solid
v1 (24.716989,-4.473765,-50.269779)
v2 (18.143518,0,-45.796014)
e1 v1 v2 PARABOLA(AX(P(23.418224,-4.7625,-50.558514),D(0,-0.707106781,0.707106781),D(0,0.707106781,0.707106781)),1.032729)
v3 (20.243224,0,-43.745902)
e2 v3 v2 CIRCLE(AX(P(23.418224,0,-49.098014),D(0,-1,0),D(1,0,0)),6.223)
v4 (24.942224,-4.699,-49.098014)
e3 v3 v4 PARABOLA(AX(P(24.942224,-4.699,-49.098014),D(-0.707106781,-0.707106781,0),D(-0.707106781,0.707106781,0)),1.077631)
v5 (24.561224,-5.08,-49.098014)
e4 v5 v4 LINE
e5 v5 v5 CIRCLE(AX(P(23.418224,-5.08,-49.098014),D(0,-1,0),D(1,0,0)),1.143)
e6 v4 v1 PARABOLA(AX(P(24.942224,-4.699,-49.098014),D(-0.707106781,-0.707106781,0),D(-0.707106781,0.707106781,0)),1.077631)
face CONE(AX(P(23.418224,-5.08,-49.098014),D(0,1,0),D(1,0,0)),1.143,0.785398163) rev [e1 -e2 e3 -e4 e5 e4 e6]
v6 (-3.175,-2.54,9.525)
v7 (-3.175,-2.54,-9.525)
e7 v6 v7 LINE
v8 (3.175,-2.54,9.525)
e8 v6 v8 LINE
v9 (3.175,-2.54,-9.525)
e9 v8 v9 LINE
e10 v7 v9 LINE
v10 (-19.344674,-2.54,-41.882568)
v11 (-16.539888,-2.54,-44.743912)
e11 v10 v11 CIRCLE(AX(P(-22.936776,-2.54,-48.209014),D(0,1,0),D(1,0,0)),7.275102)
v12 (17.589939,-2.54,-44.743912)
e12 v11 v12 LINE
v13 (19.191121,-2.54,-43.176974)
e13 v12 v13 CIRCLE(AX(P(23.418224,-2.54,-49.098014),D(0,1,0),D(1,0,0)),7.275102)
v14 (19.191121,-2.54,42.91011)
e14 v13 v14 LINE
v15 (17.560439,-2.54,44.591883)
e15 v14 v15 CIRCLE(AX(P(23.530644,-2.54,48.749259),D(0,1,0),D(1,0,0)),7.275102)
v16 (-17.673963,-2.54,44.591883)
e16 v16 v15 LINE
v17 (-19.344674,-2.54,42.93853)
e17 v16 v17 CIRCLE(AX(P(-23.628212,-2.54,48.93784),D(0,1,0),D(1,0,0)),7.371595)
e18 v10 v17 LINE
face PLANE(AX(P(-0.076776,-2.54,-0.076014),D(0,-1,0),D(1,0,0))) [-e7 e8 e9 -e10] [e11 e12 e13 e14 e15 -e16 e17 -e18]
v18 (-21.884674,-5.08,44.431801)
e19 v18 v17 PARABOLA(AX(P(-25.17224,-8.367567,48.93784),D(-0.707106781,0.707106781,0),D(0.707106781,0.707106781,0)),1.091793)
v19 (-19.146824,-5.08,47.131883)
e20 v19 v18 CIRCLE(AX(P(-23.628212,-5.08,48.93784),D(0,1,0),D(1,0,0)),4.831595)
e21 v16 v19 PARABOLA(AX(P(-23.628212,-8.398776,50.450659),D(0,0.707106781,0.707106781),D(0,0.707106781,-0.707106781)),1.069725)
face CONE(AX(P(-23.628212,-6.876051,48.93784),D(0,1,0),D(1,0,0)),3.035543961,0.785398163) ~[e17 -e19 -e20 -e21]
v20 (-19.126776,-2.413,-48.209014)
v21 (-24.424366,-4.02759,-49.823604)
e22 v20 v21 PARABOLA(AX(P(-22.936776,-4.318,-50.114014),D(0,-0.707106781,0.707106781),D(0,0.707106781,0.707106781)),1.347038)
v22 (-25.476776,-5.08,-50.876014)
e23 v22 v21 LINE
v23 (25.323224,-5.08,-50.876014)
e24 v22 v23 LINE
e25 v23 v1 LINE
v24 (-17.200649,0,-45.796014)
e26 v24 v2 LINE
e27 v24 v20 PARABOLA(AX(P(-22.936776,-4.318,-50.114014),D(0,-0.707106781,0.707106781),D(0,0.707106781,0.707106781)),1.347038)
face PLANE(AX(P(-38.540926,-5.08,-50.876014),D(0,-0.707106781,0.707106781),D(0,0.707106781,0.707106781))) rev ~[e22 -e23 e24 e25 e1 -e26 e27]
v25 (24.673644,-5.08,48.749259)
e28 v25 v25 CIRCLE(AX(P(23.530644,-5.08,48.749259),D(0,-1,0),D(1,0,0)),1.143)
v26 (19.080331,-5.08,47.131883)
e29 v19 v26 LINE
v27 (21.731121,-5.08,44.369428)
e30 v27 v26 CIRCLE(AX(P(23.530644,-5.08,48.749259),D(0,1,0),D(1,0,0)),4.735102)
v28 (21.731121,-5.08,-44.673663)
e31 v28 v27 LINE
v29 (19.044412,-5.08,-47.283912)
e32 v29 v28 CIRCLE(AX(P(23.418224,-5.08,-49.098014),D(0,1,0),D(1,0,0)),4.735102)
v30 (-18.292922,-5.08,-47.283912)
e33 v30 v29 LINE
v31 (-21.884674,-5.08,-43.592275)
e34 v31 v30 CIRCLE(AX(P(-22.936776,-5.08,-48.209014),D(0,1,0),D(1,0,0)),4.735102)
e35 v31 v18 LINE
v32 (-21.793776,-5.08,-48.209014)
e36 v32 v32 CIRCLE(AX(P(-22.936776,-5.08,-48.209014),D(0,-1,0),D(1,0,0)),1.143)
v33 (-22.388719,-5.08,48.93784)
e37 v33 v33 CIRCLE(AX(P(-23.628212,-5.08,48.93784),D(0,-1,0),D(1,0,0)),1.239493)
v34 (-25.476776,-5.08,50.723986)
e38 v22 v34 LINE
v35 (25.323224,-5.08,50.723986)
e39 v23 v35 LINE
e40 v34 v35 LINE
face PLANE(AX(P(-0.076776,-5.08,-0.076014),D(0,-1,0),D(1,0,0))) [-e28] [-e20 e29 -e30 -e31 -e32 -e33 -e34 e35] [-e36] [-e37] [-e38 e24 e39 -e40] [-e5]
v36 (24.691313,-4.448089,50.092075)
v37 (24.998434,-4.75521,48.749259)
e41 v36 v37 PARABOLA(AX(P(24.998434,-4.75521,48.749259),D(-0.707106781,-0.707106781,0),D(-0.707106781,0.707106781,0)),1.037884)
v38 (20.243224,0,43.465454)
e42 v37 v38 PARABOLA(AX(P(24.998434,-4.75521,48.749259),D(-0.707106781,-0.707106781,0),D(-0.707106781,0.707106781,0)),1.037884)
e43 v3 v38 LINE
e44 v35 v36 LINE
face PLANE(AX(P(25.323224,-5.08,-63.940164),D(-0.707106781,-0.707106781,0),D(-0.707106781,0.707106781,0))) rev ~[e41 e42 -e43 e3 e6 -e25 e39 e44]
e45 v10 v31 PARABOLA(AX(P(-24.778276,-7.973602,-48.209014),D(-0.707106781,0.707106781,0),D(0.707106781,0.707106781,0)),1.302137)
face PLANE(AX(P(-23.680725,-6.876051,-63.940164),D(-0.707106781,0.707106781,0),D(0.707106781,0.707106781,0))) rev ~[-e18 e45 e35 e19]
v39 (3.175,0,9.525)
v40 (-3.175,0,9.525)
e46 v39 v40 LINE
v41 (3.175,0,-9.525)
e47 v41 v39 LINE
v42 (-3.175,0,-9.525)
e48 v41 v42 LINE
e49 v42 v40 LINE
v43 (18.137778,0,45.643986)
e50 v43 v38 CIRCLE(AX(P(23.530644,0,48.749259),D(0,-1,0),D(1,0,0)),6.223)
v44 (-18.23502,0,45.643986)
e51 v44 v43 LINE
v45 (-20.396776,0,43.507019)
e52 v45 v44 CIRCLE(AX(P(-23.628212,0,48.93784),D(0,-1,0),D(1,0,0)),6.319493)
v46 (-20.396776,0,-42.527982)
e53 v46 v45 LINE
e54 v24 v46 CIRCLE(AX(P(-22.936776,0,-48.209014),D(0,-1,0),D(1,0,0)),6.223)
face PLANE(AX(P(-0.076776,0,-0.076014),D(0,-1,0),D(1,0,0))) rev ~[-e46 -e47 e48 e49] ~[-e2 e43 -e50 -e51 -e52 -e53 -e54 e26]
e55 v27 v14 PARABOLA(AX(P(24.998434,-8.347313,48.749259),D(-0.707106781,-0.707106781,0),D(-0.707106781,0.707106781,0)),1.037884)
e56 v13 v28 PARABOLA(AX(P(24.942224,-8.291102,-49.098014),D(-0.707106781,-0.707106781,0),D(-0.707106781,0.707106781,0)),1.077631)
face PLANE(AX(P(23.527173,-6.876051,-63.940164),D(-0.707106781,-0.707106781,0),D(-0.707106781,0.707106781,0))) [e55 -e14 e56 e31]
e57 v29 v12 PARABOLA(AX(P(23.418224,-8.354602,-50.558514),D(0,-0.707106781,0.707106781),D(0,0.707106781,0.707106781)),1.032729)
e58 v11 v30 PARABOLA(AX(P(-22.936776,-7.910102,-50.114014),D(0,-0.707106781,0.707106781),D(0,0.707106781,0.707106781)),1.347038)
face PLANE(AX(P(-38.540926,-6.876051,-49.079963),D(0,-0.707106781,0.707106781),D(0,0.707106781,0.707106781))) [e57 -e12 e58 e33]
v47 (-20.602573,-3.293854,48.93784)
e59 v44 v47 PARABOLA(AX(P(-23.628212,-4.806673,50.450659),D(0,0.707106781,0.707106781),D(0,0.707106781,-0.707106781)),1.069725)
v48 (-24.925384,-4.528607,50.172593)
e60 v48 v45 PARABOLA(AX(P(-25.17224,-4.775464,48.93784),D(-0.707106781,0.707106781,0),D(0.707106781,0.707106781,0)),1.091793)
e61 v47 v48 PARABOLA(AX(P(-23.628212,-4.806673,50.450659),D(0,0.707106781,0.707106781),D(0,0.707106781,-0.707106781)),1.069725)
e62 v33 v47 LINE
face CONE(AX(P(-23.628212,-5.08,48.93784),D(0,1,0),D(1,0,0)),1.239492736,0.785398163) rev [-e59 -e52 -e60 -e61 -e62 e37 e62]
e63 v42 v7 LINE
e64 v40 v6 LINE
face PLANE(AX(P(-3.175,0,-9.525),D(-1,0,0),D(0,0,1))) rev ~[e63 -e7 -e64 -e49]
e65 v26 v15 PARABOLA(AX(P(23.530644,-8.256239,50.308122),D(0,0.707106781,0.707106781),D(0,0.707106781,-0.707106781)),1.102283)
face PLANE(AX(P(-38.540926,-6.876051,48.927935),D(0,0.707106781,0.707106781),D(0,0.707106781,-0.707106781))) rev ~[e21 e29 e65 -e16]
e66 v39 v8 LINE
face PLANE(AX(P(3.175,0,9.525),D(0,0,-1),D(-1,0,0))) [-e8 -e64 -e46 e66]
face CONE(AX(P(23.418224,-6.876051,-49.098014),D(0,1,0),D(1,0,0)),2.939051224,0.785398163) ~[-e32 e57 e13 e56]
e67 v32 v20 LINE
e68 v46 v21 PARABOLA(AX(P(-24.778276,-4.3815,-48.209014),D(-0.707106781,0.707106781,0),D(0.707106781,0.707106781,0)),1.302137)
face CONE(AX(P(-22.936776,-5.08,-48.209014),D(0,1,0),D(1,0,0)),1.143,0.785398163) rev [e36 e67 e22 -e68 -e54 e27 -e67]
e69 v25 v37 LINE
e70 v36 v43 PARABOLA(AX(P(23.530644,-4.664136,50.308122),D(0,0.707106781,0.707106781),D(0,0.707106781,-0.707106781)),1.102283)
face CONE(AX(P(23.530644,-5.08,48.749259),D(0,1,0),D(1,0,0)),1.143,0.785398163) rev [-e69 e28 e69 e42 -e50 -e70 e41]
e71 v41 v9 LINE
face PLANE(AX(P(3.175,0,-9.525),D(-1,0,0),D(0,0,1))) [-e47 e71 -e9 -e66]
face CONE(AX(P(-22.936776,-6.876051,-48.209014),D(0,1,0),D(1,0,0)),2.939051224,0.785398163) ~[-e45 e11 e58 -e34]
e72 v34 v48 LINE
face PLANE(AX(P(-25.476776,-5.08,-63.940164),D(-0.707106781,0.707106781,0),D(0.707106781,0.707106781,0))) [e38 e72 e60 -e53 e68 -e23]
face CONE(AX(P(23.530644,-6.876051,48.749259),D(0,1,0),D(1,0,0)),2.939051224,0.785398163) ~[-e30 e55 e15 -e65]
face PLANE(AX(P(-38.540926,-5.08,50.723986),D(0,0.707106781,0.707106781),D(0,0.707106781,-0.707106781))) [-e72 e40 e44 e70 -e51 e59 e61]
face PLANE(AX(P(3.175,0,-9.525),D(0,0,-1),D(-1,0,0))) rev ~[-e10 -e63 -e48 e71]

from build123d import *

# Parameters (mm, degrees)
F0_W        = 50.8
F0_H        = 101.6
F0_R        = 1.143
F0_R_2      = 1.2394927364
F1_DEPTH    = 5.08
F2_T1_DEPTH = 127.7282991577
F2_T3_DEPTH = 76.9282991577
F3_T        = -2.54
F4_W        = 6.35
F4_H        = 19.05
F5_DEPTH    = 25.4


# Not quite as in the source:
# - a fillet or chamfer that OpenCascade refuses, or shapes differently, is made with other operations: its cross-section is extruded or revolved along the edge and cut away or added


with BuildPart() as f1:
    # F0 (on Front) → F1 (new body)
    with BuildSketch(Plane.XZ):
        with Locations((-0.076776122, -0.0760140894)):
            Rectangle(F0_W, F0_H)
        with Locations((-22.936776122, -48.2090140894)):
            Circle(F0_R, mode=Mode.SUBTRACT)
        with Locations((23.418223878, -49.0980140894)):
            Circle(F0_R, mode=Mode.SUBTRACT)
        with Locations((-23.6282116387, 48.9378400757)):
            Circle(F0_R_2, mode=Mode.SUBTRACT)
        with Locations((23.5306444928, 48.7492585503)):
            Circle(F0_R, mode=Mode.SUBTRACT)
    extrude(amount=F1_DEPTH)

    # F2: chamfer of 5.08 on 8 edges, made by hand

    # F2_s2 → F2_t1 (cut)
    with BuildSketch(Plane.XY.offset(-63.9401636683)):
        Polygon((25.323223878, -5.08), (20.243223878, 0), (25.323223878, 0), align=None)
        Polygon((-25.476776122, -5.08), (-20.396776122, 0), (-25.476776122, 0), align=None)
    extrude(amount=F2_T1_DEPTH, mode=Mode.SUBTRACT)

    # F2_s4 → F2_t3 (cut)
    with BuildSketch(Plane.YZ.offset(-38.5409257009)):
        Polygon((-5.08, 50.7239859106), (0, 45.6439859106), (0, 50.7239859106), align=None)
        Polygon((-5.08, -50.8760140894), (0, -45.7960140894), (0, -50.8760140894), align=None)
    extrude(amount=F2_T3_DEPTH, mode=Mode.SUBTRACT)

    # F2_s5 → F2_t6 (revolve, cut)
    with BuildSketch(Plane.XY.offset(48.9378400757)):
        Polygon((-22.3887189023, -5.08), (-17.3087189023, 0), (-22.3887189023, 0), align=None)
    revolve(axis=Axis((-23.6282116387, 0, 48.9378400757), (0, -1, 0)), mode=Mode.SUBTRACT)

    # F2_s7 → F2_t8 (revolve, cut)
    with BuildSketch(Plane.XY.offset(48.7492585503)):
        Polygon((24.6736444928, -5.08), (29.7536444928, 0), (24.6736444928, 0), align=None)
    revolve(axis=Axis((23.5306444928, 0, 48.7492585503), (0, -1, 0)), mode=Mode.SUBTRACT)

    # F2_s9 → F2_t10 (revolve, cut)
    with BuildSketch(Plane.XY.offset(-48.2090140894)):
        Polygon((-21.793776122, -5.08), (-16.713776122, 0), (-21.793776122, 0), align=None)
    revolve(axis=Axis((-22.936776122, 0, -48.2090140894), (0, -1, 0)), mode=Mode.SUBTRACT)

    # F2_s11 → F2_t12 (revolve, cut)
    with BuildSketch(Plane.XY.offset(-49.0980140894)):
        Polygon((24.561223878, -5.08), (29.641223878, 0), (24.561223878, 0), align=None)
    revolve(axis=Axis((23.418223878, 0, -49.0980140894), (0, -1, 0)), mode=Mode.SUBTRACT)

    # F3
    f3_openings = [f1.faces().sort_by_distance(p)[0] for p in [
        (-0.074021, -5.08, -0.083441),
    ]]
    offset(amount=F3_T, openings=f3_openings)

    # F4 (on face) → F5 (cut)
    with BuildSketch(Plane(origin=(0, 0, 0), x_dir=(-1, 0, 0), z_dir=(0, 1, 0))):
        Rectangle(F4_W, F4_H)
    extrude(amount=-F5_DEPTH, mode=Mode.SUBTRACT)


solid = f1.part
